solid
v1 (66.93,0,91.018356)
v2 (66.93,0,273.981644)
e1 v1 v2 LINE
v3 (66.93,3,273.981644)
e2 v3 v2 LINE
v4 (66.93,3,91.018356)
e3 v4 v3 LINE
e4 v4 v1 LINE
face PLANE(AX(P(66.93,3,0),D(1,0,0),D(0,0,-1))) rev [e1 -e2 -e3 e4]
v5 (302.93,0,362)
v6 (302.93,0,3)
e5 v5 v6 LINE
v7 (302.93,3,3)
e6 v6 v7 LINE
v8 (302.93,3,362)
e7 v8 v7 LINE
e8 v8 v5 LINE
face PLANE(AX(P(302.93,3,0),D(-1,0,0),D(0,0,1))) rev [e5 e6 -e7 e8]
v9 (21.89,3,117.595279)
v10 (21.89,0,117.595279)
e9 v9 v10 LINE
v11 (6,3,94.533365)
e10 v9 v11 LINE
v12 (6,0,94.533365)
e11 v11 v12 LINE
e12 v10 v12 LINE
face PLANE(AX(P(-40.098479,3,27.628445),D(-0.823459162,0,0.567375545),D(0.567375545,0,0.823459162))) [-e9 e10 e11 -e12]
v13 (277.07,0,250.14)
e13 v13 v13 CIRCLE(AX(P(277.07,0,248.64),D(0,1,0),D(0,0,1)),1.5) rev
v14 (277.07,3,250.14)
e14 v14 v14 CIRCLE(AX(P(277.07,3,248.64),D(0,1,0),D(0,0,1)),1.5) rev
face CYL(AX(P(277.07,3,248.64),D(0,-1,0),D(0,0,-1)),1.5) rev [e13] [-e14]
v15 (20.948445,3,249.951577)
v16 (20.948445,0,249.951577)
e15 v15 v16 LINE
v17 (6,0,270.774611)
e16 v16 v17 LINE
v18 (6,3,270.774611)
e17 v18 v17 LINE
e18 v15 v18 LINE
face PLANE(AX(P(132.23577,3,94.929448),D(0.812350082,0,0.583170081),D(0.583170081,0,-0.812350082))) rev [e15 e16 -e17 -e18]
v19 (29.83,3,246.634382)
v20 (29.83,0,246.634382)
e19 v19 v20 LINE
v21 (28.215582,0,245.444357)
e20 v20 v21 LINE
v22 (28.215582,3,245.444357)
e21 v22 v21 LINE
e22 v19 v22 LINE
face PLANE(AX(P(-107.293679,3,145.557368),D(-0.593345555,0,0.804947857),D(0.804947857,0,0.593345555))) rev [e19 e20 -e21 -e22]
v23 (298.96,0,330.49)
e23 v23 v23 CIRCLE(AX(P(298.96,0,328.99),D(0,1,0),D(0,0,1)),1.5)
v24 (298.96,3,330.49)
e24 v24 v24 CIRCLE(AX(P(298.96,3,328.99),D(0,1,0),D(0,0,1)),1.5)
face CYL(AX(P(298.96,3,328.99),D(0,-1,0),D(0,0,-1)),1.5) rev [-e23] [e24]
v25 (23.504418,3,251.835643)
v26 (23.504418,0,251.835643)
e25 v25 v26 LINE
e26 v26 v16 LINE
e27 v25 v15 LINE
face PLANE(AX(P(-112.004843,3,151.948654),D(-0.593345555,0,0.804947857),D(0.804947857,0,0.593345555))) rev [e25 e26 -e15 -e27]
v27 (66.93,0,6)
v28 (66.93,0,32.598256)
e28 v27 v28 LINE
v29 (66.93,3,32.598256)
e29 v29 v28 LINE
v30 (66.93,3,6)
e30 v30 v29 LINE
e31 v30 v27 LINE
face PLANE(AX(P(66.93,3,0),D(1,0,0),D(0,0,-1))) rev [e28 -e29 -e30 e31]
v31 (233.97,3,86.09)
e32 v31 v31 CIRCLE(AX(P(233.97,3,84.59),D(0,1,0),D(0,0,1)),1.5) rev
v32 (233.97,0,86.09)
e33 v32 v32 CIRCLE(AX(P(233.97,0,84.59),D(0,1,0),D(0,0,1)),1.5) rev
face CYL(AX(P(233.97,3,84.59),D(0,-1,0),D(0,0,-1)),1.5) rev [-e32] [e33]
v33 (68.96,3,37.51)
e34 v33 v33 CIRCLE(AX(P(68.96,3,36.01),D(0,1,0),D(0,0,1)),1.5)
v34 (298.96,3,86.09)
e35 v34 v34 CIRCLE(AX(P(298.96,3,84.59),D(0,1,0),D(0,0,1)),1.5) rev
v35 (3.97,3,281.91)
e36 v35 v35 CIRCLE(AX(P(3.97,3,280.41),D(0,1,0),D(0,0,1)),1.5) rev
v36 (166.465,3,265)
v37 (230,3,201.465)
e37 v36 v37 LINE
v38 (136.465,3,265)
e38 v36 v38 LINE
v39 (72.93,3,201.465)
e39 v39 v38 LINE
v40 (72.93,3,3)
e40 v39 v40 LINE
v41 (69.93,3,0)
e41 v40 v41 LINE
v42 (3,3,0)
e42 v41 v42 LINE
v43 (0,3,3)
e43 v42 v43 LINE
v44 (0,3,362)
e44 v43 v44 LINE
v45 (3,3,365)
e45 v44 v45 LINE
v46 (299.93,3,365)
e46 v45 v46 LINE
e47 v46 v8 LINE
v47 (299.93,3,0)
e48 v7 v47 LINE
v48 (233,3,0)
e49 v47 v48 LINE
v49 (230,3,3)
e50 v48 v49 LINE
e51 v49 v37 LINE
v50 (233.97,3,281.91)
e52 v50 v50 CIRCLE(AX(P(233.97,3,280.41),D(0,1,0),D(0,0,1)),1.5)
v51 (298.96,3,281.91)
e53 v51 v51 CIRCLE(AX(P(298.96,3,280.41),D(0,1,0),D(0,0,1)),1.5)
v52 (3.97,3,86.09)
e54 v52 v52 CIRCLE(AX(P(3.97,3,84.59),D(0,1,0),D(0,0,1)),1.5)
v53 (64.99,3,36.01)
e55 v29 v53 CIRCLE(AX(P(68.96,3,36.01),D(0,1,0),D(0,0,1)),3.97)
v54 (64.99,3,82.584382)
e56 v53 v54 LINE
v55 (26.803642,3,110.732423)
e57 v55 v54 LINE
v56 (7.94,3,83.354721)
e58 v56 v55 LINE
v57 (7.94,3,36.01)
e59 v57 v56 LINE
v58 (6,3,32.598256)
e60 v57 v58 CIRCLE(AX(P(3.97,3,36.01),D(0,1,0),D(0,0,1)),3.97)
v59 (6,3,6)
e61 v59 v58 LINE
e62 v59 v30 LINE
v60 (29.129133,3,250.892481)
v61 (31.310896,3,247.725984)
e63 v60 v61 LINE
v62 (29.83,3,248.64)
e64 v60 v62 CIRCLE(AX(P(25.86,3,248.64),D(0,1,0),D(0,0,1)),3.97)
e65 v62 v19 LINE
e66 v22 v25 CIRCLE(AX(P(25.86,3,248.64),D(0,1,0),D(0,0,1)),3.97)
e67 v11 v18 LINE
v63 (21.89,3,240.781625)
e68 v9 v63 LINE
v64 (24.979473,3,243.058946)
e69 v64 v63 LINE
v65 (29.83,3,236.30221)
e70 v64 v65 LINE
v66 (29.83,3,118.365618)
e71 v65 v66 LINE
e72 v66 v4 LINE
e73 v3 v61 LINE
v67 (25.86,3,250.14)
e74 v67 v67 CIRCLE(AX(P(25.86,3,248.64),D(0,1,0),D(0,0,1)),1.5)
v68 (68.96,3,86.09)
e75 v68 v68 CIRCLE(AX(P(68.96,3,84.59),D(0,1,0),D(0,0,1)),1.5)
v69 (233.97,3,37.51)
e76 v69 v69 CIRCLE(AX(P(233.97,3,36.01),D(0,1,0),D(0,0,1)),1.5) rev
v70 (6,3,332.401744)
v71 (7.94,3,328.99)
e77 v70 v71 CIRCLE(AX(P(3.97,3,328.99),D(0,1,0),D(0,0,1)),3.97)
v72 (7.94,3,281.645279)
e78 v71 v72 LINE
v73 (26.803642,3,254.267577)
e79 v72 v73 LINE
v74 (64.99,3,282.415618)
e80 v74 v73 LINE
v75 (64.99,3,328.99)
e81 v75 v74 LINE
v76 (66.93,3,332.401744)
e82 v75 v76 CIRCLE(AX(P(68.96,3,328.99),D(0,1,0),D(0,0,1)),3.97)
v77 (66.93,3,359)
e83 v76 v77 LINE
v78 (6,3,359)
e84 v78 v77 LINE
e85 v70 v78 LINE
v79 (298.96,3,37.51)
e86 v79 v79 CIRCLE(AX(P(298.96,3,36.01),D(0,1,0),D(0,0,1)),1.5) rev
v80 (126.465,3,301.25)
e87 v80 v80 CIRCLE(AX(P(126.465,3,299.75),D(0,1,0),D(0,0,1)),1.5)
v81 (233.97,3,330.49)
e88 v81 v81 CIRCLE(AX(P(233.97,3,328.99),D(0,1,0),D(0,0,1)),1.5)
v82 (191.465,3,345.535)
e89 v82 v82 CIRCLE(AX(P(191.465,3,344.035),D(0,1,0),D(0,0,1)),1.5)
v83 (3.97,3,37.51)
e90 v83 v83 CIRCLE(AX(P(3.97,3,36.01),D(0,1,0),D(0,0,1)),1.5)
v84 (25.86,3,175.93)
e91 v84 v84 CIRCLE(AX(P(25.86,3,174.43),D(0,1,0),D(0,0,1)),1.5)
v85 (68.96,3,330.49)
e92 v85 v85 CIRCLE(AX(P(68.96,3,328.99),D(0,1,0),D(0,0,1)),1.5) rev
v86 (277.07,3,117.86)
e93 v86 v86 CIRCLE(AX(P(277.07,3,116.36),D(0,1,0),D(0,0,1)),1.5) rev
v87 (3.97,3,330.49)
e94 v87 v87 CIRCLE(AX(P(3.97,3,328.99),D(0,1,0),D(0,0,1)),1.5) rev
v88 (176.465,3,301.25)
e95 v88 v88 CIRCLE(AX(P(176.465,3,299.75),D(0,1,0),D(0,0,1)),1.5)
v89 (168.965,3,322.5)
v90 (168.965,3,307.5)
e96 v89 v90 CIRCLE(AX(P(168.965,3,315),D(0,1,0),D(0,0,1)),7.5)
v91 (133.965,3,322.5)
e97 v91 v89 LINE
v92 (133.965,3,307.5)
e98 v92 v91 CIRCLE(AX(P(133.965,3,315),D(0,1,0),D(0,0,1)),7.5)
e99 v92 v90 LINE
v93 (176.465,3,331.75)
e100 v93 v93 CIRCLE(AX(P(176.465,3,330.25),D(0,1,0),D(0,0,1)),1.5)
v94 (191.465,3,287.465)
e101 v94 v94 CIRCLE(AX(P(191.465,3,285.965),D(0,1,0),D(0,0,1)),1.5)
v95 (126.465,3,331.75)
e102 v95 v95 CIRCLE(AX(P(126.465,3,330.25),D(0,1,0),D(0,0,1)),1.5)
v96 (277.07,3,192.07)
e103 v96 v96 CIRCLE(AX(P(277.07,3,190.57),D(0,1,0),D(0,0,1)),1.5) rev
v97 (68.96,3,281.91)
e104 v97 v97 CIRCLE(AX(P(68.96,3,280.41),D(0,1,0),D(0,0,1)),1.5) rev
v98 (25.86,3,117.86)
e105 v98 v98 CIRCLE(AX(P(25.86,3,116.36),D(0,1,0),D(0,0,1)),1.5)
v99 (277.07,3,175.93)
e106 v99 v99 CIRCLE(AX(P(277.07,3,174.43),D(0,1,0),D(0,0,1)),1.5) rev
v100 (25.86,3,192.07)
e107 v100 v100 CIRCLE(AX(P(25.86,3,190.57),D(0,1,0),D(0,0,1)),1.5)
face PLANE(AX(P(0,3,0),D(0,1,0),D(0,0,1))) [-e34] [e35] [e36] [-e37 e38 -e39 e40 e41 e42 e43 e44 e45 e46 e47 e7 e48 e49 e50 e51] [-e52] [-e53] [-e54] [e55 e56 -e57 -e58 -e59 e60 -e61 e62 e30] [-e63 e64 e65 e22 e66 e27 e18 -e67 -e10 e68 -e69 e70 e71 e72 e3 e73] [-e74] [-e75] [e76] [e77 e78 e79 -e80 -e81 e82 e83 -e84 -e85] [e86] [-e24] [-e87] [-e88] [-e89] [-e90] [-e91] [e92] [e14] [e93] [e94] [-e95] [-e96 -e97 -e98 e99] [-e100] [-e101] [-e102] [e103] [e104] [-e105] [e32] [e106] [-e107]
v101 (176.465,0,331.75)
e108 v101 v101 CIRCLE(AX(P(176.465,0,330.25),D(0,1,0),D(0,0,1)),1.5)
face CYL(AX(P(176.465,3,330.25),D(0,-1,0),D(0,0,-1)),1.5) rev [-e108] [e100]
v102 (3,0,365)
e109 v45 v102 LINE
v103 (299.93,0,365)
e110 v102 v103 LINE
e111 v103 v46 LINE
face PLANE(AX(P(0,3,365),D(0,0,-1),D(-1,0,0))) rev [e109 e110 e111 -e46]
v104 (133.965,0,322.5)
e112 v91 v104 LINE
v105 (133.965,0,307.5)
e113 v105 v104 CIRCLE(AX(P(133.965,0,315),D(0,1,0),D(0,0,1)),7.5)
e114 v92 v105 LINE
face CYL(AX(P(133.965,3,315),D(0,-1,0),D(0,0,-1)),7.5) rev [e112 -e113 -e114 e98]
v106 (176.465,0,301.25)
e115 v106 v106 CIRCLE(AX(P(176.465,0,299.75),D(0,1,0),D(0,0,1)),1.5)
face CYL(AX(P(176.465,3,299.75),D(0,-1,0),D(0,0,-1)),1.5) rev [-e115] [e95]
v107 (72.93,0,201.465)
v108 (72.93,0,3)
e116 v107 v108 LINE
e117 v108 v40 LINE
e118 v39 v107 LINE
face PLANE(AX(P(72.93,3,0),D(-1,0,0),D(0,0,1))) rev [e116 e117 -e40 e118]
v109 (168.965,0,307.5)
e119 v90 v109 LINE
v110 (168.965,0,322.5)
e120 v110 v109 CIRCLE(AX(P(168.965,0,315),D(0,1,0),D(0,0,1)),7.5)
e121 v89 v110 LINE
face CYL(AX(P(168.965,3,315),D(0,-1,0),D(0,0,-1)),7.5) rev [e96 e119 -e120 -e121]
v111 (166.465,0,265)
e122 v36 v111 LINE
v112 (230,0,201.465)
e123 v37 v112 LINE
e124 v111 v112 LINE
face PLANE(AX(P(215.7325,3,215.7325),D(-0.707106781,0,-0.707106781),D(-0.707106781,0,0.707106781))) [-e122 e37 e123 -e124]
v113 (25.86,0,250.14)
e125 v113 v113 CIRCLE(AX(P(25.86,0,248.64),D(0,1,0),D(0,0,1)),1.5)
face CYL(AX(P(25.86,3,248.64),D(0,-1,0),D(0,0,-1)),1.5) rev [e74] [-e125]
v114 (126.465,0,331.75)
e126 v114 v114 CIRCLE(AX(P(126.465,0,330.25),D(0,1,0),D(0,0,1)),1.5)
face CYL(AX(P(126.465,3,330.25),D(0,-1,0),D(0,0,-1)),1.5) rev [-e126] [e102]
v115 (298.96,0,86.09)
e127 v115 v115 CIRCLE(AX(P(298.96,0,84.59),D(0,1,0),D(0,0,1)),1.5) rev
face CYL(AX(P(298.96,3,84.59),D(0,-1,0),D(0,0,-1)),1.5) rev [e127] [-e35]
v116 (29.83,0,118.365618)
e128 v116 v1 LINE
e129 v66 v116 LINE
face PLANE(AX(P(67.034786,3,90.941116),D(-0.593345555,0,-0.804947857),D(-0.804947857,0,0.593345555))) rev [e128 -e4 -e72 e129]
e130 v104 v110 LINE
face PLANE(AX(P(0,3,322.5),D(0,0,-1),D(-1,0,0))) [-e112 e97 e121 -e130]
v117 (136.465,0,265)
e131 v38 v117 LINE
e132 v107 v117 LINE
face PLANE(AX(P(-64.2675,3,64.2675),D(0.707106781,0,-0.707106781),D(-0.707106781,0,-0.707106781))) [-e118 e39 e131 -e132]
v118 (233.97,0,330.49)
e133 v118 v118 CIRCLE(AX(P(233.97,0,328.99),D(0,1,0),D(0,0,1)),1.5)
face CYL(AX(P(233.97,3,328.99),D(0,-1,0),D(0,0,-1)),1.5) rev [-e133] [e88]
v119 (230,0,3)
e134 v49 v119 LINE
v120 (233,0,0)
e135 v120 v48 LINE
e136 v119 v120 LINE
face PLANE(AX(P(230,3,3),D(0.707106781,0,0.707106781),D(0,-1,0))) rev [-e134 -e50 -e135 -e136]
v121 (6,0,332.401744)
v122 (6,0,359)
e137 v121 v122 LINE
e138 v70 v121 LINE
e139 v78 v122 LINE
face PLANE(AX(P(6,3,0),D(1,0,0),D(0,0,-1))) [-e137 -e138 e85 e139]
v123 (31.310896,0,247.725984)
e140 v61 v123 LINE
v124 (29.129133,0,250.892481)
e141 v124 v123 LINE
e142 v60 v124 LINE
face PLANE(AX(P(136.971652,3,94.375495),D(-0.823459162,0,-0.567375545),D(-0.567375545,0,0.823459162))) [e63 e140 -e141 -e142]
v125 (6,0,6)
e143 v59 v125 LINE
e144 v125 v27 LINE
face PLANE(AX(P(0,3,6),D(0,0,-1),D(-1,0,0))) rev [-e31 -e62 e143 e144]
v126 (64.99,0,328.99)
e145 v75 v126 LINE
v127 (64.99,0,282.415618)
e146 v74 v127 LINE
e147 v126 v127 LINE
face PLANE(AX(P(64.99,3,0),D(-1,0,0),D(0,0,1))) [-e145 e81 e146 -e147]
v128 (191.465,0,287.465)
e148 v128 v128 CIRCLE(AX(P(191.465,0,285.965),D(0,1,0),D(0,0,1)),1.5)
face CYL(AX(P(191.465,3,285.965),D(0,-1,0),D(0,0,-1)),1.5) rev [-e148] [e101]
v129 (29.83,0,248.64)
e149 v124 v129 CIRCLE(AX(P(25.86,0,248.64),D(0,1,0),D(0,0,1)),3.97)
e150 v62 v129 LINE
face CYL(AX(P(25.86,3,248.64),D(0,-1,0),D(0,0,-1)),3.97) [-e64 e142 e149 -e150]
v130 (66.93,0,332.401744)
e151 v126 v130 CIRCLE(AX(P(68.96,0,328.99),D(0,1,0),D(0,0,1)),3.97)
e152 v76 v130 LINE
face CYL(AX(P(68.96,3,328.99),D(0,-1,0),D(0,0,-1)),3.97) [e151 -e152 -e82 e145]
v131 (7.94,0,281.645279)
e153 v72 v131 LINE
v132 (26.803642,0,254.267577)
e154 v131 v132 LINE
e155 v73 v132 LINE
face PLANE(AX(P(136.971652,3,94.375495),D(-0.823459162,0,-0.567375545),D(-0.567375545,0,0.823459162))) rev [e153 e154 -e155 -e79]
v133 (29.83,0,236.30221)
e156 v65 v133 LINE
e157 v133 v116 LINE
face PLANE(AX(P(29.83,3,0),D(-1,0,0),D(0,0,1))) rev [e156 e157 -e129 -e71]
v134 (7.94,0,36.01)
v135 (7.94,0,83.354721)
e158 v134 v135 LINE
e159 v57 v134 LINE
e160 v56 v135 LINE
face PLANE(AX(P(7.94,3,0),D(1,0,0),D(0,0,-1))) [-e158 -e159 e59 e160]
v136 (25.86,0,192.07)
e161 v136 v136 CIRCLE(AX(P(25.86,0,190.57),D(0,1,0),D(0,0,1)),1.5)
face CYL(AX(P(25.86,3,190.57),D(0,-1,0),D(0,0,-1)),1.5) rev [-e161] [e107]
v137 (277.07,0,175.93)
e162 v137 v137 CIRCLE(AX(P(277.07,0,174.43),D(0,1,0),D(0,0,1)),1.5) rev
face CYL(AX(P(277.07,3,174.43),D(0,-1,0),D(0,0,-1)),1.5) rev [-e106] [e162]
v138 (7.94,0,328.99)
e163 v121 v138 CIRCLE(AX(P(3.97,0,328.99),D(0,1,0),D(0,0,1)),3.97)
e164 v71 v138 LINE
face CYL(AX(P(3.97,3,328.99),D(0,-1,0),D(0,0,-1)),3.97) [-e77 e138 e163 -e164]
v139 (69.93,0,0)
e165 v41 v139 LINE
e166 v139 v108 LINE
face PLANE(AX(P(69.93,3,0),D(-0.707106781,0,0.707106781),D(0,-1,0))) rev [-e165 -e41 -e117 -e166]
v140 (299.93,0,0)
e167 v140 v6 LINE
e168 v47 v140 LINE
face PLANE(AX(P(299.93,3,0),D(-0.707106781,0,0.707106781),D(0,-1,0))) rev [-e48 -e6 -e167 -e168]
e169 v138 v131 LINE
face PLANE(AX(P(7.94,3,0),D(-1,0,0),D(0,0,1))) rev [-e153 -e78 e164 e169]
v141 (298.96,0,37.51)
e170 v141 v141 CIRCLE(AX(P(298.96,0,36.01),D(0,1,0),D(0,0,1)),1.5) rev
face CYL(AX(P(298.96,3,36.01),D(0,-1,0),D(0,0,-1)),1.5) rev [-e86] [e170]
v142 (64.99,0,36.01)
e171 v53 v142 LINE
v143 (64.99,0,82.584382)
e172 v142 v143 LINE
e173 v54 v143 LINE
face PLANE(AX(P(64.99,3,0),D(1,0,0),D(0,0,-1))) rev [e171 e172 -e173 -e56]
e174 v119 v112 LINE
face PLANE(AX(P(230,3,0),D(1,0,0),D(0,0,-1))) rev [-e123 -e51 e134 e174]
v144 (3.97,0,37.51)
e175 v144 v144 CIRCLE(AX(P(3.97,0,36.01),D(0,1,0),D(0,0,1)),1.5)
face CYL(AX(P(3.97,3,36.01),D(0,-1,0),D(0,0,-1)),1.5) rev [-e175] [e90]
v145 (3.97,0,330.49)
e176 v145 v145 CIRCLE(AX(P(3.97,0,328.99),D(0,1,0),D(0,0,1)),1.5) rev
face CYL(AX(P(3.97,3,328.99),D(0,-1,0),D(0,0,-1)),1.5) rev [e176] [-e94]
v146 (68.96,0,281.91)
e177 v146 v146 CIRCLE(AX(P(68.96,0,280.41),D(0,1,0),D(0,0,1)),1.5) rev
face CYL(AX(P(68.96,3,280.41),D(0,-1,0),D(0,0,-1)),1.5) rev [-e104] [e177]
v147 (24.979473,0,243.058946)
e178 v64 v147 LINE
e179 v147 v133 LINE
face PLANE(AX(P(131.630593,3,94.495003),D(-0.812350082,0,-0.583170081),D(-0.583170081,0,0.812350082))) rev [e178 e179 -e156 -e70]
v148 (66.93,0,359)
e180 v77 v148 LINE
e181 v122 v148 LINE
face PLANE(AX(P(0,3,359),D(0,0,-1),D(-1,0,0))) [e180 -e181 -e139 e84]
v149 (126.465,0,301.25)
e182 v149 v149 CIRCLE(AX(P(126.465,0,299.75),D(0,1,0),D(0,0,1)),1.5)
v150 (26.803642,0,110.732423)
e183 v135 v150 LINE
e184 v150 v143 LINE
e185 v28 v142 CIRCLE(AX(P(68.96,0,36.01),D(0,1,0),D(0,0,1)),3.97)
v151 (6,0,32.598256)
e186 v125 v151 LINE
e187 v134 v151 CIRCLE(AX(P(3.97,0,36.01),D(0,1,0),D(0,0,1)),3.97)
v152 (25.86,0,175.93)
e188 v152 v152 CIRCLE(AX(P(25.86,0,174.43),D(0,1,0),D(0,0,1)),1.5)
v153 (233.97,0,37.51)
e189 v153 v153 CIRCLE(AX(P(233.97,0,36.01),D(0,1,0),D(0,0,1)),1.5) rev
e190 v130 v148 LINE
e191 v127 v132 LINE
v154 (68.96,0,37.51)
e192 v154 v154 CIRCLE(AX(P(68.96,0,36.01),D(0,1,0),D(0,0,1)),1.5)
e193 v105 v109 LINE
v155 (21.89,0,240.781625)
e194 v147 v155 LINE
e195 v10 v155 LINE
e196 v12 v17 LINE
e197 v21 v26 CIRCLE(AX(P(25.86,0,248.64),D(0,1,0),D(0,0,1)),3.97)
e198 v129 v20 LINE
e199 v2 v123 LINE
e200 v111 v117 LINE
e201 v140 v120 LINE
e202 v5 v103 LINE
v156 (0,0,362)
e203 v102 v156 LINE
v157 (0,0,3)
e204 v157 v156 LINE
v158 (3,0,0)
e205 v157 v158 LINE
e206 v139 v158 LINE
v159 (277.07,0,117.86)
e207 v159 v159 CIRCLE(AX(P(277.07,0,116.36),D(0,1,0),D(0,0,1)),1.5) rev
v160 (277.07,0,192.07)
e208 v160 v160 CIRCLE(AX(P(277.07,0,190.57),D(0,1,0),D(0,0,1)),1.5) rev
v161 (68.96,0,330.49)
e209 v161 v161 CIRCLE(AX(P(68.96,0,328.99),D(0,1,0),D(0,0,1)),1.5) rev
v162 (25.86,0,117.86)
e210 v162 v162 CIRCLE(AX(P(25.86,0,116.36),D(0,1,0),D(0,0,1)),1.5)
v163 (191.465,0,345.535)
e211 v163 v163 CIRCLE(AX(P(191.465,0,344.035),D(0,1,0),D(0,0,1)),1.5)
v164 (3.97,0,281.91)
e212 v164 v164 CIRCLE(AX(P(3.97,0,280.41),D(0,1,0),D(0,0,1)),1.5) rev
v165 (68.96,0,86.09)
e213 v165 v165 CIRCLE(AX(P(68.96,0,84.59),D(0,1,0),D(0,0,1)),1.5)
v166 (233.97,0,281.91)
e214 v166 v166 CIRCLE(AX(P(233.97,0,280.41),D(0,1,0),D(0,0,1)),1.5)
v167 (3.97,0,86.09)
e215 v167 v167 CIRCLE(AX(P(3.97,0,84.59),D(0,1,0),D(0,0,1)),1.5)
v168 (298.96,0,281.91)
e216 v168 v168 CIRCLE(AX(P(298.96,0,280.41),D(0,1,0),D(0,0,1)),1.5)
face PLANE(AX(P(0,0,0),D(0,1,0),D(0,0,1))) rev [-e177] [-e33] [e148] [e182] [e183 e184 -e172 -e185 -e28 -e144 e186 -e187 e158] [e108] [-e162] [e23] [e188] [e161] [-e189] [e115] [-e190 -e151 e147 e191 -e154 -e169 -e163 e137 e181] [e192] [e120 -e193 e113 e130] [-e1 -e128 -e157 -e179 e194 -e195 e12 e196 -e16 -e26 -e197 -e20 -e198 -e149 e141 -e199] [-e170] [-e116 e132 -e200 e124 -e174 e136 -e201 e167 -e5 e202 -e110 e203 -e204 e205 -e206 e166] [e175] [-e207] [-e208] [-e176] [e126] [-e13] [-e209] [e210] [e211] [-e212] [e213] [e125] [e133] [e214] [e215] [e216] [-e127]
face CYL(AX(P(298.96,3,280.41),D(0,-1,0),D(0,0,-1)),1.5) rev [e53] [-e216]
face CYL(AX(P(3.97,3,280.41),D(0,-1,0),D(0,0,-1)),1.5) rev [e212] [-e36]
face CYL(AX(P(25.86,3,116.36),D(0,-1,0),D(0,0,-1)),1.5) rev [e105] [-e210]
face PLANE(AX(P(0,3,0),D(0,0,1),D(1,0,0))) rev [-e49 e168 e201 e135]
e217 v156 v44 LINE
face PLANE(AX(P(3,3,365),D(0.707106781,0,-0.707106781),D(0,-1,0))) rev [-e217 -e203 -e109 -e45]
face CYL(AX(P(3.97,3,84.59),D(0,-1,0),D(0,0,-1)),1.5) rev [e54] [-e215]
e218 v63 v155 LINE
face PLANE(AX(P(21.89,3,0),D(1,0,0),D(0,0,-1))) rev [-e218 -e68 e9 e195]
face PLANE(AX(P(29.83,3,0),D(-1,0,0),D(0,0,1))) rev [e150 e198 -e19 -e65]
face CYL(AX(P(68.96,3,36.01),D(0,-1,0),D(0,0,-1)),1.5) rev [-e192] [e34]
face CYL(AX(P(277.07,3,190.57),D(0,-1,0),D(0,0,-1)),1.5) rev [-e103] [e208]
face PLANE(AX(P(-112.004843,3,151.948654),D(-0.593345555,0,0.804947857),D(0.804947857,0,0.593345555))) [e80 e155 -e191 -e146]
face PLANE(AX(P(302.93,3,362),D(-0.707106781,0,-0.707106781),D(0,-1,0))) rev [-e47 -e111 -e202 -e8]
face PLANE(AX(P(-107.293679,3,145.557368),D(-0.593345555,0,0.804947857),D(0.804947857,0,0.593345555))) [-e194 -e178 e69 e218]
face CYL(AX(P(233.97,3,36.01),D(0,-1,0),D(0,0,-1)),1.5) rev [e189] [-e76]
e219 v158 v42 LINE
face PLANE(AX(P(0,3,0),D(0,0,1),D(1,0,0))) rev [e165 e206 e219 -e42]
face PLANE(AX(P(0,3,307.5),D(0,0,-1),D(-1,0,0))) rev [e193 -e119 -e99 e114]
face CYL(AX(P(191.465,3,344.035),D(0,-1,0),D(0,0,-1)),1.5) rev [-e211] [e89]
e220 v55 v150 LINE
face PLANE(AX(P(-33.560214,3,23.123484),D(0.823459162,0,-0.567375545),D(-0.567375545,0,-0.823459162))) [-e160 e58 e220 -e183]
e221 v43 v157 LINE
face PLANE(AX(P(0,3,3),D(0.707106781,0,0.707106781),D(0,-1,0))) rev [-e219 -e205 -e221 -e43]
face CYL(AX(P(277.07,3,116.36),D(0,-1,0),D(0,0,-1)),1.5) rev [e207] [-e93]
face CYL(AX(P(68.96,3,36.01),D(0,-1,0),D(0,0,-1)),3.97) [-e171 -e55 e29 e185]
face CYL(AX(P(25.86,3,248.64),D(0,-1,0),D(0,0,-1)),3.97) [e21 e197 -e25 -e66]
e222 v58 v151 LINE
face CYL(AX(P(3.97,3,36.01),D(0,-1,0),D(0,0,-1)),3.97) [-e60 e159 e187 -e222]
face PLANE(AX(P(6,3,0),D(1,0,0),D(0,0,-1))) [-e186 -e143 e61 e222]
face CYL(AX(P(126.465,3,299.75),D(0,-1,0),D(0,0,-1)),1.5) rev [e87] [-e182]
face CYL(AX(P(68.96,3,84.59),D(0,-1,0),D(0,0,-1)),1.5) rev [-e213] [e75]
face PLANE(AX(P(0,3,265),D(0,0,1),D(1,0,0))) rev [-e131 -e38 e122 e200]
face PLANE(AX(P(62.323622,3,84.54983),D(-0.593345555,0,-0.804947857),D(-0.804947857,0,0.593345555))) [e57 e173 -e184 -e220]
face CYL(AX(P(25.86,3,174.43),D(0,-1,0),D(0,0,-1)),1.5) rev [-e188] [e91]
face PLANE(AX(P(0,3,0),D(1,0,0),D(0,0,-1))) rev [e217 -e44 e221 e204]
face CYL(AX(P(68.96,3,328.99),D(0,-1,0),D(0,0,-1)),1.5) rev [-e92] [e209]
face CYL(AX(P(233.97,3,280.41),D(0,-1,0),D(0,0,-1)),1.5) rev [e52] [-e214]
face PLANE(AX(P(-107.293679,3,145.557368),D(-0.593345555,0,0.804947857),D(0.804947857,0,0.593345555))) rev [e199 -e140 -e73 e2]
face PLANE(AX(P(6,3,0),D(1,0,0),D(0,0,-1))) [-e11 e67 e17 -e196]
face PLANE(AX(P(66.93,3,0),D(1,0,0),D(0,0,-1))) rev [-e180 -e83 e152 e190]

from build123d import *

# Parameters (mm, degrees)
SKETCH1_R           = 1.5
BOSS_EXTRUDE1_DEPTH = 3
CHAMFER1_SIZE       = 3


with BuildPart() as part:
    # Sketch1 → Boss-Extrude1 (new body)
    with BuildSketch(Plane(origin=(0, 0, 0), x_dir=(1, 0, 0), z_dir=(0, 1, 0))):
        Polygon((0, 0), (0, -365), (302.93, -365), (302.93, 0), (230, 0), (230, -201.465), (166.465, -265), (136.465, -265), (72.93, -201.465), (72.93, 0), align=None)
        with Locations(Location((3.97, -328.99, 0), (0, 0, 270))):
            Circle(SKETCH1_R, mode=Mode.SUBTRACT)
        with Locations(Location((68.96, -328.99, 0), (0, 0, 270))):
            Circle(SKETCH1_R, mode=Mode.SUBTRACT)
        with BuildLine():
            Line((26.803641974, -254.267576658), (64.99, -282.415618293))
            Line((64.99, -282.415618293), (64.99, -328.99))
            ThreePointArc((64.99, -328.99), (65.508913215, -330.952371015), (66.93, -332.401744422))
            Line((66.93, -332.401744422), (66.93, -359))
            Line((66.93, -359), (6, -359))
            Line((6, -359), (6, -332.401744422))
            ThreePointArc((6, -332.401744422), (7.421086785, -330.952371015), (7.94, -328.99))
            Line((7.94, -328.99), (7.94, -281.645279056))
            Line((7.94, -281.645279056), (26.803641974, -254.267576658))
        make_face(mode=Mode.SUBTRACT)
        with Locations(Location((3.97, -280.41, 0), (0, 0, 270))):
            Circle(SKETCH1_R, mode=Mode.SUBTRACT)
        with Locations(Location((126.465, -330.25, 0), (0, 0, 270))):
            Circle(SKETCH1_R, mode=Mode.SUBTRACT)
        with BuildLine():
            ThreePointArc((133.965, -322.5), (126.465, -315), (133.965, -307.5))
            Line((133.965, -307.5), (168.965, -307.5))
            ThreePointArc((168.965, -307.5), (176.465, -315), (168.965, -322.5))
            Line((168.965, -322.5), (133.965, -322.5))
        make_face(mode=Mode.SUBTRACT)
        with Locations(Location((126.465, -299.75, 0), (0, 0, 270))):
            Circle(SKETCH1_R, mode=Mode.SUBTRACT)
        with Locations(Location((25.86, -248.64, 0), (0, 0, 270))):
            Circle(SKETCH1_R, mode=Mode.SUBTRACT)
        with Locations(Location((25.86, -190.57, 0), (0, 0, 270))):
            Circle(SKETCH1_R, mode=Mode.SUBTRACT)
        with Locations(Location((176.465, -330.25, 0), (0, 0, 270))):
            Circle(SKETCH1_R, mode=Mode.SUBTRACT)
        with Locations(Location((191.465, -344.035, 0), (0, 0, 270))):
            Circle(SKETCH1_R, mode=Mode.SUBTRACT)
        with Locations(Location((176.465, -299.75, 0), (0, 0, 270))):
            Circle(SKETCH1_R, mode=Mode.SUBTRACT)
        with Locations(Location((191.465, -285.965, 0), (0, 0, 270))):
            Circle(SKETCH1_R, mode=Mode.SUBTRACT)
        with Locations(Location((233.97, -328.99, 0), (0, 0, 270))):
            Circle(SKETCH1_R, mode=Mode.SUBTRACT)
        with Locations(Location((298.96, -328.99, 0), (0, 0, 270))):
            Circle(SKETCH1_R, mode=Mode.SUBTRACT)
        with Locations(Location((233.97, -280.41, 0), (0, 0, 270))):
            Circle(SKETCH1_R, mode=Mode.SUBTRACT)
        with Locations(Location((298.96, -280.41, 0), (0, 0, 270))):
            Circle(SKETCH1_R, mode=Mode.SUBTRACT)
        with Locations(Location((277.07, -248.64, 0), (0, 0, 270))):
            Circle(SKETCH1_R, mode=Mode.SUBTRACT)
        with Locations(Location((277.07, -190.57, 0), (0, 0, 270))):
            Circle(SKETCH1_R, mode=Mode.SUBTRACT)
        with Locations(Location((25.86, -174.43, 0), (0, 0, 270))):
            Circle(SKETCH1_R, mode=Mode.SUBTRACT)
        with BuildLine():
            Line((66.93, -91.018356112), (66.93, -273.981643888))
            Line((66.93, -273.981643888), (31.310895985, -247.725984153))
            Line((31.310895985, -247.725984153), (29.129132873, -250.892480912))
            ThreePointArc((29.129132873, -250.892480912), (29.650735912, -249.819500423), (29.83, -248.64))
            Line((29.83, -248.64), (29.83, -246.634381707))
            Line((29.83, -246.634381707), (28.215581853, -245.444357008))
            ThreePointArc((28.215581853, -245.444357008), (22.664357008, -246.284418147), (23.504418147, -251.835642992))
            Line((23.504418147, -251.835642992), (20.948445099, -249.951576548))
            Line((20.948445099, -249.951576548), (6, -270.774610859))
            Line((6, -270.774610859), (6, -94.53336494))
            Line((6, -94.53336494), (21.89, -117.595279056))
            Line((21.89, -117.595279056), (21.89, -240.781625326))
            Line((21.89, -240.781625326), (24.979472521, -243.058946487))
            Line((24.979472521, -243.058946487), (29.83, -236.302210288))
            Line((29.83, -236.302210288), (29.83, -118.365618293))
            Line((29.83, -118.365618293), (66.93, -91.018356112))
        make_face(mode=Mode.SUBTRACT)
        with Locations(Location((25.86, -116.36, 0), (0, 0, 270))):
            Circle(SKETCH1_R, mode=Mode.SUBTRACT)
        with Locations(Location((3.97, -84.59, 0), (0, 0, 270))):
            Circle(SKETCH1_R, mode=Mode.SUBTRACT)
        with BuildLine():
            Line((64.99, -82.584381707), (26.803641974, -110.732423342))
            Line((26.803641974, -110.732423342), (7.94, -83.354720944))
            Line((7.94, -83.354720944), (7.94, -36.01))
            ThreePointArc((7.94, -36.01), (7.421086785, -34.047628985), (6, -32.598255578))
            Line((6, -32.598255578), (6, -6))
            Line((6, -6), (66.93, -6))
            Line((66.93, -6), (66.93, -32.598255578))
            ThreePointArc((66.93, -32.598255578), (65.508913215, -34.047628985), (64.99, -36.01))
            Line((64.99, -36.01), (64.99, -82.584381707))
        make_face(mode=Mode.SUBTRACT)
        with Locations(Location((68.96, -84.59, 0), (0, 0, 270))):
            Circle(SKETCH1_R, mode=Mode.SUBTRACT)
        with Locations(Location((3.97, -36.01, 0), (0, 0, 270))):
            Circle(SKETCH1_R, mode=Mode.SUBTRACT)
        with Locations(Location((68.96, -36.01, 0), (0, 0, 270))):
            Circle(SKETCH1_R, mode=Mode.SUBTRACT)
        with Locations(Location((277.07, -174.43, 0), (0, 0, 270))):
            Circle(SKETCH1_R, mode=Mode.SUBTRACT)
        with Locations(Location((277.07, -116.36, 0), (0, 0, 270))):
            Circle(SKETCH1_R, mode=Mode.SUBTRACT)
        with Locations(Location((233.97, -84.59, 0), (0, 0, 270))):
            Circle(SKETCH1_R, mode=Mode.SUBTRACT)
        with Locations(Location((298.96, -84.59, 0), (0, 0, 270))):
            Circle(SKETCH1_R, mode=Mode.SUBTRACT)
        with Locations(Location((233.97, -36.01, 0), (0, 0, 270))):
            Circle(SKETCH1_R, mode=Mode.SUBTRACT)
        with Locations(Location((298.96, -36.01, 0), (0, 0, 270))):
            Circle(SKETCH1_R, mode=Mode.SUBTRACT)
        with Locations(Location((68.96, -280.41, 0), (0, 0, 270))):
            Circle(SKETCH1_R, mode=Mode.SUBTRACT)
    extrude(amount=BOSS_EXTRUDE1_DEPTH)

    # Chamfer1
    chamfer1_edges = [part.edges().sort_by_distance(p)[0] for p in [
        (72.93, 1.5, 0),
        (230, 1.5, 0),
        (302.93, 1.5, 0),
        (302.93, 1.5, 365),
        (0, 1.5, 365),
        (0, 1.5, 0),
    ]]
    chamfer(chamfer1_edges, length=CHAMFER1_SIZE)


solid = part.part
